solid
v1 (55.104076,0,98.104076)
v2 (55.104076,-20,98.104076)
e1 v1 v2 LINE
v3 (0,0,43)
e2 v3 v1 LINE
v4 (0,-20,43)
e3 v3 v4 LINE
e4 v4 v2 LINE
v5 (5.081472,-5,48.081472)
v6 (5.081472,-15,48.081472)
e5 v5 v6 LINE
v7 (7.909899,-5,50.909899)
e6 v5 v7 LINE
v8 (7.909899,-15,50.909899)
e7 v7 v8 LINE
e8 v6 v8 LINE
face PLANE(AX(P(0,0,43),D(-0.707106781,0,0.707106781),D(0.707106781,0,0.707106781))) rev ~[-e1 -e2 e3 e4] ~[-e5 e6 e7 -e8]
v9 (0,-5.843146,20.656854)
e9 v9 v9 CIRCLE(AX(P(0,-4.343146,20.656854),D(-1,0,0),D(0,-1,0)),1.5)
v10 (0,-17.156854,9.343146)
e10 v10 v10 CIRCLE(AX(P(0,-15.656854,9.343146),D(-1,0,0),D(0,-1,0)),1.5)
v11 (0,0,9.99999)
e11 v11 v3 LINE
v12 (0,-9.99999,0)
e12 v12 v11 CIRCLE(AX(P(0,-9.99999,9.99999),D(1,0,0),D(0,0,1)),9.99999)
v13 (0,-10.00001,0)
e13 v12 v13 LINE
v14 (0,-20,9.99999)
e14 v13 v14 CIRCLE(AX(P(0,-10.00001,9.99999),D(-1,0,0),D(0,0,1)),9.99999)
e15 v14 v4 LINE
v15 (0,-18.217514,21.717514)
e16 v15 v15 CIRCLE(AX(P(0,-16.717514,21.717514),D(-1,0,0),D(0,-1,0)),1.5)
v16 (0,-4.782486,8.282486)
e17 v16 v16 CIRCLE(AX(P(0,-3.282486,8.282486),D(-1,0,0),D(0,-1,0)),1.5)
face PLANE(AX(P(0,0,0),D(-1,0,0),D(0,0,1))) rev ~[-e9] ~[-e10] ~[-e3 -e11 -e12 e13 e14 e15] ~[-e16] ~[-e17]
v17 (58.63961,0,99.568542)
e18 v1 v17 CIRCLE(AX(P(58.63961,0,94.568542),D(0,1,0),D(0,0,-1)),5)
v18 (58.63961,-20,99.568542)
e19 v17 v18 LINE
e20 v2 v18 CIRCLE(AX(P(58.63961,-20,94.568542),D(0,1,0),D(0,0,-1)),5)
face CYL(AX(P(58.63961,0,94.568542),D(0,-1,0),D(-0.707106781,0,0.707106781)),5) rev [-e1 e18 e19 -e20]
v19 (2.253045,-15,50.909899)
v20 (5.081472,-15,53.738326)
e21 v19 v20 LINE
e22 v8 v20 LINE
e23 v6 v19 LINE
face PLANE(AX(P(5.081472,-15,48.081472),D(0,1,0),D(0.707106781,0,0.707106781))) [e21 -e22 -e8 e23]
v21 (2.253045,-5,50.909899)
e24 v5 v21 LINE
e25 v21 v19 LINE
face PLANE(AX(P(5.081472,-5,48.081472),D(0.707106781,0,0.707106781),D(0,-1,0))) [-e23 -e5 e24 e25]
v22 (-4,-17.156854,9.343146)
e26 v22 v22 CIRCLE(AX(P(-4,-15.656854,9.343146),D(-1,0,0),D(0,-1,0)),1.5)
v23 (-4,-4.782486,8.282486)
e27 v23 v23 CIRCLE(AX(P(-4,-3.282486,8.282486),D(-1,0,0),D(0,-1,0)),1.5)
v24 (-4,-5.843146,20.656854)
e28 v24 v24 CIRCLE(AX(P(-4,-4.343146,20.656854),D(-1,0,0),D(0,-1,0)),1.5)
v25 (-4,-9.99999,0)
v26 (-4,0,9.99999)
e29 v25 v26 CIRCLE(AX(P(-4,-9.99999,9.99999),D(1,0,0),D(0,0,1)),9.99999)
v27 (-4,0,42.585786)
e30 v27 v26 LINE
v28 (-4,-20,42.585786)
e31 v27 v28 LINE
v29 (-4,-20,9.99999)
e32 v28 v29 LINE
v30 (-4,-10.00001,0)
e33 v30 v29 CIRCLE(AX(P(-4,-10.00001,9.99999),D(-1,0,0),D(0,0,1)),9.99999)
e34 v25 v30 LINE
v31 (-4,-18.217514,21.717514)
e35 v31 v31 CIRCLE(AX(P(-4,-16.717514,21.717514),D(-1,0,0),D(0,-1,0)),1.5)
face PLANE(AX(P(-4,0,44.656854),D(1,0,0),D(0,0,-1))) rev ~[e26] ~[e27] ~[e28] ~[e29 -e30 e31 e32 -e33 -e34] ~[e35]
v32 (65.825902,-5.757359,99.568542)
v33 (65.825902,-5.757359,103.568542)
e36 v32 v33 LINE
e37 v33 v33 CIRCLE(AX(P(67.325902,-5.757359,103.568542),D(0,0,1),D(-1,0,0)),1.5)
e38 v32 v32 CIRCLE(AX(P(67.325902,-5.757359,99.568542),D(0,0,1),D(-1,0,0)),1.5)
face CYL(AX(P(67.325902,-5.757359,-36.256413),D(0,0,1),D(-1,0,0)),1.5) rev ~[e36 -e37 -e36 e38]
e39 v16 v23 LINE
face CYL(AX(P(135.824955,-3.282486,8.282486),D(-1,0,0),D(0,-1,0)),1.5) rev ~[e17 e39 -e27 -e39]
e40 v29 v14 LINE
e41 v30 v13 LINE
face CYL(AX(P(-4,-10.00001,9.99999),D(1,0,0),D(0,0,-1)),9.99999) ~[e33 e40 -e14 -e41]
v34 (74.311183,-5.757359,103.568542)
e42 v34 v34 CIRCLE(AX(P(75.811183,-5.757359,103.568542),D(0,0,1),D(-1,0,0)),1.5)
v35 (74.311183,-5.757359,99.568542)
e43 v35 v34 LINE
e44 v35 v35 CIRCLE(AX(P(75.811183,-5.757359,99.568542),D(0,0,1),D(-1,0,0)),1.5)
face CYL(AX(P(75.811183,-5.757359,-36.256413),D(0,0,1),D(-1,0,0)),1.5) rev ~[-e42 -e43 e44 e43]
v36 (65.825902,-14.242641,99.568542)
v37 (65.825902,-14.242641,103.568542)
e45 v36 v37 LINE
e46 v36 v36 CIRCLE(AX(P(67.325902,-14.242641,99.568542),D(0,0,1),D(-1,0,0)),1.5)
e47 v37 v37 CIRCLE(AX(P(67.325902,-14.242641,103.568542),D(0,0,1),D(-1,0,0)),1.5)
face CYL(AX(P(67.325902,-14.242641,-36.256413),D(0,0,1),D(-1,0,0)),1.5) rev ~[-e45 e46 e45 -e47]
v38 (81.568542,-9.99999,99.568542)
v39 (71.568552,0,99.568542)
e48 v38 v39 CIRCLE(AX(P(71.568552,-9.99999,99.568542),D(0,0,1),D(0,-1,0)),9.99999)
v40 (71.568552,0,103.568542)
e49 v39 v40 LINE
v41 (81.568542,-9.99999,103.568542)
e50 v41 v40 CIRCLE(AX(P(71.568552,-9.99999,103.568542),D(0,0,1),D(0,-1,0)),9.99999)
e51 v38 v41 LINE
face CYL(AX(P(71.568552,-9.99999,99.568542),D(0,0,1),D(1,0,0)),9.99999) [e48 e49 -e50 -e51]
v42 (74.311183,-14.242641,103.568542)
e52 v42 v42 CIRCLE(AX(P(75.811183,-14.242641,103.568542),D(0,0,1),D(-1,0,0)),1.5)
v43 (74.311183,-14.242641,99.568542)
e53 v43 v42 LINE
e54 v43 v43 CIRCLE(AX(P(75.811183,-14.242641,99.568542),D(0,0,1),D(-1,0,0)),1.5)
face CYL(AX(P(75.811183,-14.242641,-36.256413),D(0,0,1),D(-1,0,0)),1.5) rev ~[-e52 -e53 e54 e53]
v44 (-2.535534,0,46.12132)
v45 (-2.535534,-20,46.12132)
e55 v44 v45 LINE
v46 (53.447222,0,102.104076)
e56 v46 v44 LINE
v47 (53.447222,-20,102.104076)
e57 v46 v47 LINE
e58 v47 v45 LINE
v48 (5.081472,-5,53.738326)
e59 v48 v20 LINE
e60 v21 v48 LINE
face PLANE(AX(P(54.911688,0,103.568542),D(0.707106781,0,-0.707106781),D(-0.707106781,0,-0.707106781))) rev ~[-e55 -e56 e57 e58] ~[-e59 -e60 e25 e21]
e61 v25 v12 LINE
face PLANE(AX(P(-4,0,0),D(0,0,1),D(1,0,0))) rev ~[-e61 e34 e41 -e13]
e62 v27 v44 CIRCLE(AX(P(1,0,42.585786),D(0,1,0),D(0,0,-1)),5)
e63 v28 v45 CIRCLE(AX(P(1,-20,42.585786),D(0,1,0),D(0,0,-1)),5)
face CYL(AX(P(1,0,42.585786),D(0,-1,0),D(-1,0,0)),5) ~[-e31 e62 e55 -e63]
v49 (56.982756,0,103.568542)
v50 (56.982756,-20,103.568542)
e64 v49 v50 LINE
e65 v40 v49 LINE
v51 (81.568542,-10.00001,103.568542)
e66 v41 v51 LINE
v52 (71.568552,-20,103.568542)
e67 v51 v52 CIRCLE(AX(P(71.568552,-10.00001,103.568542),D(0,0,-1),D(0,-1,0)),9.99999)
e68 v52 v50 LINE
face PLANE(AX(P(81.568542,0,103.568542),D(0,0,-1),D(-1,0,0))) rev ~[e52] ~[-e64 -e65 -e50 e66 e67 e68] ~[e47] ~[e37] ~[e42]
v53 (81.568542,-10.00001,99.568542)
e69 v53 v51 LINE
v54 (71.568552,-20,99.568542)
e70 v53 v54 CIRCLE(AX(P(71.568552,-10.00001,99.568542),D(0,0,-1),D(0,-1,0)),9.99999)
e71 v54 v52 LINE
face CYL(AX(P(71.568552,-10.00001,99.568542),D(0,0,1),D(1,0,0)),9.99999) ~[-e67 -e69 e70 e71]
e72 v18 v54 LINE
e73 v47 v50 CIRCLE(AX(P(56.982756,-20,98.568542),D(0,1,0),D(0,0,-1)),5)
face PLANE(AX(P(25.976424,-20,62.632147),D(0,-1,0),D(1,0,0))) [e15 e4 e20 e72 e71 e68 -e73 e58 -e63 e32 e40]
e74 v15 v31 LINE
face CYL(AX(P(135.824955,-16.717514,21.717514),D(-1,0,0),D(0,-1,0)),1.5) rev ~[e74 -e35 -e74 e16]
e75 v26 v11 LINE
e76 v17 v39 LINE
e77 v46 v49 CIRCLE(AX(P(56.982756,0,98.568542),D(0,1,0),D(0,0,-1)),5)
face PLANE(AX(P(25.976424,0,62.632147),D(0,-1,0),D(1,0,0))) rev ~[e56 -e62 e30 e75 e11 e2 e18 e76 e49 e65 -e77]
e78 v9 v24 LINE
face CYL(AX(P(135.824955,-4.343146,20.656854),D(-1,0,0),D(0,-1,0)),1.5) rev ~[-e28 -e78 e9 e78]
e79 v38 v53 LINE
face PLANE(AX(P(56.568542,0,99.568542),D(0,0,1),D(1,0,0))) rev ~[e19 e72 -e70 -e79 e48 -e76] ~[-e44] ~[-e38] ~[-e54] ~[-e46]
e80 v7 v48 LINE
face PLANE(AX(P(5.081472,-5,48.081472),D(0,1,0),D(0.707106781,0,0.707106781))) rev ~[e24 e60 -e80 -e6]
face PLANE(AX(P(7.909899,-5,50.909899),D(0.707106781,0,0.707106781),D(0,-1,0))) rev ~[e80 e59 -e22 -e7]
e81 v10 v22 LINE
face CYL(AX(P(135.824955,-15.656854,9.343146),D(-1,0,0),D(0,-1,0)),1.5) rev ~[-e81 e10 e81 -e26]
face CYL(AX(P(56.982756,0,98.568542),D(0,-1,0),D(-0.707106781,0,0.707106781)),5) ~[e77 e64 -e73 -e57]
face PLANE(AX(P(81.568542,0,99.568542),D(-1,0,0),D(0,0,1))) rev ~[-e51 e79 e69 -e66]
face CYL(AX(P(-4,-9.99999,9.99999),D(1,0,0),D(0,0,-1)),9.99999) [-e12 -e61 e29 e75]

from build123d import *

# Parameters (mm, degrees)
F1_DEPTH = 20
F3_R     = 9.99999
F4_D     = 3
F5_R     = 5
F7_D     = 3
F8_W     = 4
F8_H     = 10
F9_DEPTH = 25


# Not quite as in the source:
# - a fillet or chamfer is up to 0.001 mm smaller than in the source, because OpenCascade refuses the exact size


with BuildPart() as f1:
    # F0 (on Front) → F1 (new body)
    with BuildSketch(Plane.XZ):
        Polygon((-4, 0), (0, 0), (0, 43), (56.5685424949, 99.5685424949), (81.5685424949, 99.5685424949), (81.5685424949, 103.5685424949), (54.9116882454, 103.5685424949), (-4, 44.6568542495), align=None)
    extrude(amount=F1_DEPTH)

    # F3 (radius 10 in the source; OpenCascade refuses exactly that, so slightly less here)
    f3_edges = [f1.edges().sort_by_distance(p)[0] for p in [
        (-2, -20, 0),
        (-2, 0, 0),
        (81.568542, 0, 101.568542),
        (81.568542, -20, 101.568542),
    ]]
    fillet(f3_edges, radius=F3_R)

    # F4 (through all)
    with Locations(Plane(origin=(0, 0, 99.5685424949), x_dir=(1, 0, 0), z_dir=(0, 0, -1))):
        with Locations((75.811183182, 14.2426406871), (67.3259018078, 14.2426406871), (67.3259018078, 5.7573593129), (75.811183182, 5.7573593129)):
            Hole(F4_D / 2)

    # F5
    f5_edges = [f1.edges().sort_by_distance(p)[0] for p in [
        (54.911688, -10, 103.568542),
        (56.568542, -10, 99.568542),
        (-4, -10, 44.656854),
    ]]
    fillet(f5_edges, radius=F5_R)

    # F7 (through all)
    with Locations(Plane.YZ):
        with Locations((-4.3431457505, 20.6568542495), (-16.7175144213, 21.7175144213), (-15.6568542495, 9.3431457505), (-3.2824855787, 8.2824855787)):
            Hole(F7_D / 2)

    # F8 (on face) → F9 (cut)
    with BuildSketch(Plane(origin=(-21.5, 0, 21.5), x_dir=(0.7071067812, 0, 0.7071067812), z_dir=(0.7071067812, 0, -0.7071067812))):
        with Locations((39.5918783247, 10)):
            Rectangle(F8_W, F8_H)
    extrude(amount=-F9_DEPTH, mode=Mode.SUBTRACT)


solid = f1.part
